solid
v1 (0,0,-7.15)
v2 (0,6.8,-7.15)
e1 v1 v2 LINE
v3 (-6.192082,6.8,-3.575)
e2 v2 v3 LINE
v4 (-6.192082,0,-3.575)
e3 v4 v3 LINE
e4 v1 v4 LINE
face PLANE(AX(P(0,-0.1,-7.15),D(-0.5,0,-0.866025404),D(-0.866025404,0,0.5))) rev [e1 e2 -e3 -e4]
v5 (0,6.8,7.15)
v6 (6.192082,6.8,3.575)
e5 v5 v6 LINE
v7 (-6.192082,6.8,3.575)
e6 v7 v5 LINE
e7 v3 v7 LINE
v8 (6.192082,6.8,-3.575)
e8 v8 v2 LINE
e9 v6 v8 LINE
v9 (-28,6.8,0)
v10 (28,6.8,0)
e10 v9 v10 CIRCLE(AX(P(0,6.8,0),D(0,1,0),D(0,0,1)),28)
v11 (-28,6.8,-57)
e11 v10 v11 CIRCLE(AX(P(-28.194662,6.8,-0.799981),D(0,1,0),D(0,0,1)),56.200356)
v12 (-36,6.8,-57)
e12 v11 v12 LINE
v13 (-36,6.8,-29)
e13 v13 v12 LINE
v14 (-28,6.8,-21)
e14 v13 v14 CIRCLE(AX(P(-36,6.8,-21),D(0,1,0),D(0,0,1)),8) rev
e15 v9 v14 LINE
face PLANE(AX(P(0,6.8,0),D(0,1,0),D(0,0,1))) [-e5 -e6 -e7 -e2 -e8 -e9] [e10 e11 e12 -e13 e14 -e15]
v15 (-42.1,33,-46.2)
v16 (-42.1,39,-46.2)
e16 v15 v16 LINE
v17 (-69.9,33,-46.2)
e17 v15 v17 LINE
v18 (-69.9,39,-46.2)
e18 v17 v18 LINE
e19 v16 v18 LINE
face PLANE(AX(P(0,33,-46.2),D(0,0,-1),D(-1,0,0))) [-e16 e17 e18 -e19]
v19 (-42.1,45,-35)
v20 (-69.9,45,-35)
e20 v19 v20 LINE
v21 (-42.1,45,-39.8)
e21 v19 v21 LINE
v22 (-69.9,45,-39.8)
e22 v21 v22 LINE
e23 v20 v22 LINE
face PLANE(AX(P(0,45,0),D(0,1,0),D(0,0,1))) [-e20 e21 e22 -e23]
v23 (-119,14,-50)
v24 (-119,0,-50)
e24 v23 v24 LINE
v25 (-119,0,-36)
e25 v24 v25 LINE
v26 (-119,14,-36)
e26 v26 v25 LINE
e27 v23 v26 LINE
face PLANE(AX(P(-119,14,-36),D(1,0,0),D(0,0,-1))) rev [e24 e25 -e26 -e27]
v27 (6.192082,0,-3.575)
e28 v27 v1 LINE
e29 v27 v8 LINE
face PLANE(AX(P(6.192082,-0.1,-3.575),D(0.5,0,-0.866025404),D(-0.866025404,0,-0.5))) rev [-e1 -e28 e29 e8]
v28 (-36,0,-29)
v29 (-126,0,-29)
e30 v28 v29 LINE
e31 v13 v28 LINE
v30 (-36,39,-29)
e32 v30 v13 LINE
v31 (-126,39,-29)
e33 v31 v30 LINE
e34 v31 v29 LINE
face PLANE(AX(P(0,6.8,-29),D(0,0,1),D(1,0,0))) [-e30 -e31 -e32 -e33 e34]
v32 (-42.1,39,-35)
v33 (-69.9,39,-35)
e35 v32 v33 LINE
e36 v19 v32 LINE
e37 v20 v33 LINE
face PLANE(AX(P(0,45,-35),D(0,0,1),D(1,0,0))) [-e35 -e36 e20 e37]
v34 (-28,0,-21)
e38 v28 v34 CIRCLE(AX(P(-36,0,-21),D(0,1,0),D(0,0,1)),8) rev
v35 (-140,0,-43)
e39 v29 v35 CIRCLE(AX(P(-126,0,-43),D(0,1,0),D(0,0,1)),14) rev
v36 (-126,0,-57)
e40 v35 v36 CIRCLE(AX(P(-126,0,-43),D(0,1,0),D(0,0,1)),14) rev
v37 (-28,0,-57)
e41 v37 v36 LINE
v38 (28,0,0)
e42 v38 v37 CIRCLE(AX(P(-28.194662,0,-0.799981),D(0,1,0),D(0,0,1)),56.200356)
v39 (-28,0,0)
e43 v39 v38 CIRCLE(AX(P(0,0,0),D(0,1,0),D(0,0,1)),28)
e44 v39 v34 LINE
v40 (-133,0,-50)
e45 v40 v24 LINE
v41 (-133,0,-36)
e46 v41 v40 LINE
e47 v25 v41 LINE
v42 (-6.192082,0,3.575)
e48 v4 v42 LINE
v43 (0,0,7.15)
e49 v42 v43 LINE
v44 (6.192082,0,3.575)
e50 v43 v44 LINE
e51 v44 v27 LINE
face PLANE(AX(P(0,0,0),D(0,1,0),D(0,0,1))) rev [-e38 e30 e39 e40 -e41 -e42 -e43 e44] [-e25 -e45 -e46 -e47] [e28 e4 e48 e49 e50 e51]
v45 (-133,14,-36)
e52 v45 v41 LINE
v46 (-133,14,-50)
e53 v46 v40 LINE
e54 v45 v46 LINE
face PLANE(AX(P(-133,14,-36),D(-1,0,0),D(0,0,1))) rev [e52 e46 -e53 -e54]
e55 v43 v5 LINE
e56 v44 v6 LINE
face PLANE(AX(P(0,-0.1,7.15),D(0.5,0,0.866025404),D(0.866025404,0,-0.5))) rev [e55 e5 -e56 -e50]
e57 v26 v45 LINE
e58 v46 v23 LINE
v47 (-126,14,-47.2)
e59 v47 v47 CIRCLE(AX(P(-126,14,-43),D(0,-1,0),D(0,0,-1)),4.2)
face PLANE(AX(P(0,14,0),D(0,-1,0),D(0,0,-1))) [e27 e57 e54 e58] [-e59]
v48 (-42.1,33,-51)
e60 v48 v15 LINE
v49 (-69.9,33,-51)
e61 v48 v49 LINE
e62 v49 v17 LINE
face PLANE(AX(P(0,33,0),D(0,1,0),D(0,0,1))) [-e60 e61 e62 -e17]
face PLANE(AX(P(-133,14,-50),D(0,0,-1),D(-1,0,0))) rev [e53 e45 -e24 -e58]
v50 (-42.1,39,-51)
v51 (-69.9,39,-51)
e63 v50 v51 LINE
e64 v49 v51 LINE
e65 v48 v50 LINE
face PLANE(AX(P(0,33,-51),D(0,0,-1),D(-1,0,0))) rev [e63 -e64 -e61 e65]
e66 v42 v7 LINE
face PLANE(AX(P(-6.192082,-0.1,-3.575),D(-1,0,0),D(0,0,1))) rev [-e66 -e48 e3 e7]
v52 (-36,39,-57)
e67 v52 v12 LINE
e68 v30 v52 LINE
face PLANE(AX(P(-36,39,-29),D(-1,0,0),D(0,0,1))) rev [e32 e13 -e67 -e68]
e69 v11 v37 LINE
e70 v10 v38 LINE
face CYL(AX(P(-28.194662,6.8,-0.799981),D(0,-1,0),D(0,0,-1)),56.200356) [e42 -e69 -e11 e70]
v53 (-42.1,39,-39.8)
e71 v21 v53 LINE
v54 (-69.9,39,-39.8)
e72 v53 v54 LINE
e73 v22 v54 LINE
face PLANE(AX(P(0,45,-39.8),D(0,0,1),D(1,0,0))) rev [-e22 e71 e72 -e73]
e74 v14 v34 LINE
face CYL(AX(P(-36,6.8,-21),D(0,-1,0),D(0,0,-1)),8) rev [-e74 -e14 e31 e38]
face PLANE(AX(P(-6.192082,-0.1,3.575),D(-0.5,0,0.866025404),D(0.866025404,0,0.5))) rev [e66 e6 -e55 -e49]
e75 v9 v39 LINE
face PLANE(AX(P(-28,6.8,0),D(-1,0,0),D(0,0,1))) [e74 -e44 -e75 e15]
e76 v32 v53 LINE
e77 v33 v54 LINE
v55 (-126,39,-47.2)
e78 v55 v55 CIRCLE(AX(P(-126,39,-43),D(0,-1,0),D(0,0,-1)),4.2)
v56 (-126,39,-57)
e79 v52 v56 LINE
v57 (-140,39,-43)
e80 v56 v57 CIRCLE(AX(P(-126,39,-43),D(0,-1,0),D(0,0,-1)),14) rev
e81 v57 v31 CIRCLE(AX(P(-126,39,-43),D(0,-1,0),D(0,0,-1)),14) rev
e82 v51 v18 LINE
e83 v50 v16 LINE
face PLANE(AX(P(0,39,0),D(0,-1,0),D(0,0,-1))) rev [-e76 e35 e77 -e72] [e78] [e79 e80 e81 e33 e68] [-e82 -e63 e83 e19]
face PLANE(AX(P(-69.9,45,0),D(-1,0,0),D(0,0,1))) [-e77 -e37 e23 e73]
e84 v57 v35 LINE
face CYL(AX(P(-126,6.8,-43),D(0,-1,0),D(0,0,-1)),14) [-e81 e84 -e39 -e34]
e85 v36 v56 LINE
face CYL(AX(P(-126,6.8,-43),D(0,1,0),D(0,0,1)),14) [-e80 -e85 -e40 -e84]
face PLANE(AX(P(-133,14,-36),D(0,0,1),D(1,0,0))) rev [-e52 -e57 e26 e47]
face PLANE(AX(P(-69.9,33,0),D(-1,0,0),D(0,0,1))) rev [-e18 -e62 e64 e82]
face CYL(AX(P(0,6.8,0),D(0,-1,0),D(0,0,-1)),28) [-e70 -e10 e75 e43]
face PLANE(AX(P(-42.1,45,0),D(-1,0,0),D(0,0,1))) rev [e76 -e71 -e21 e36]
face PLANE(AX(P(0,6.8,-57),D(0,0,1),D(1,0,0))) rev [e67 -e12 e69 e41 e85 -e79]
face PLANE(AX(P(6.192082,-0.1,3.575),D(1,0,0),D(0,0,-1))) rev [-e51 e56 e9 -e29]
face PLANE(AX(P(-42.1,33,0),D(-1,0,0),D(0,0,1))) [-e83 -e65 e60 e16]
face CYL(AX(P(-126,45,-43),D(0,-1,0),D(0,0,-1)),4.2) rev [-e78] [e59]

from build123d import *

# Parameters (mm, degrees)
EXTRUDE_1_DEPTH     = 6.8
CUT_EXTRUDE_1_DEPTH = 6.9
SKETCH_3_W          = 104
SKETCH_3_H          = 28
EXTRUDE_2_DEPTH     = 32.2
SKETCH_4_W          = 27.8
SKETCH_4_H          = 4.8
CUT_EXTRUDE_2_DEPTH = 6
SKETCH_4_3_W        = 27.8
SKETCH_4_3_H        = 4.8
EXTRUDE_3_DEPTH     = 6
SKETCH_5_W          = 14
SKETCH_5_H          = 14
CUT_EXTRUDE_3_DEPTH = 14
SKETCH_6_R          = 4.2
CUT_EXTRUDE_4_DEPTH = 155.304892988
FILLET_1_R          = 14


with BuildPart() as part:
    # Эскиз1 → Бобышка-Вытянуть1 (new body)
    with BuildSketch(Plane(origin=(0, 0, 0), x_dir=(1, 0, 0), z_dir=(0, 1, 0))):
        with BuildLine():
            ThreePointArc((-28, 0), (0, -28), (28, 0))
            ThreePointArc((28, 0), (11.895099372, 40.186413418), (-28, 57))
            Line((-28, 57), (-140, 57))
            Line((-140, 57), (-140, 29))
            Line((-140, 29), (-36, 29))
            ThreePointArc((-36, 29), (-30.343145751, 26.656854249), (-28, 21))
            Line((-28, 21), (-28, 0))
        make_face()
    extrude(amount=EXTRUDE_1_DEPTH)

    # Эскиз2 → Вырез-Вытянуть1 (cut)
    with BuildSketch(Plane(origin=(0, 6.8, 0), x_dir=(1, 0, 0), z_dir=(0, 1, 0))):
        Polygon((0, 7.15), (-6.192081637, 3.575), (-6.192081637, -3.575), (0, -7.15), (6.192081637, -3.575), (6.192081637, 3.575), align=None)
    extrude(amount=-CUT_EXTRUDE_1_DEPTH, mode=Mode.SUBTRACT)

    # Эскиз3 → Бобышка-Вытянуть2 (add)
    with BuildSketch(Plane(origin=(0, 6.8, 0), x_dir=(1, 0, 0), z_dir=(0, 1, 0))):
        with Locations((-88, 43)):
            Rectangle(SKETCH_3_W, SKETCH_3_H)
    extrude(amount=EXTRUDE_2_DEPTH)

    # Эскиз4 → Вырез-Вытянуть2 (cut)
    with BuildSketch(Plane(origin=(0, 39, 0), x_dir=(1, 0, 0), z_dir=(0, 1, 0))):
        with Locations((-56, 48.6)):
            Rectangle(SKETCH_4_W, SKETCH_4_H)
    extrude(amount=-CUT_EXTRUDE_2_DEPTH, mode=Mode.SUBTRACT)

    # Эскиз4<3> → Бобышка-Вытянуть3 (add)
    with BuildSketch(Plane(origin=(0, 39, 0), x_dir=(1, 0, 0), z_dir=(0, 1, 0))):
        with Locations((-56, 37.4)):
            Rectangle(SKETCH_4_3_W, SKETCH_4_3_H)
    extrude(amount=EXTRUDE_3_DEPTH)

    # Эскиз5 → Вырез-Вытянуть3 (cut)
    with BuildSketch(Plane.XZ):
        with Locations((-126, -43)):
            Rectangle(SKETCH_5_W, SKETCH_5_H)
    extrude(amount=-CUT_EXTRUDE_3_DEPTH, mode=Mode.SUBTRACT)

    # Эскиз6 → Вырез-Вытянуть4 (cut, through all)
    with BuildSketch(Plane.XZ.offset(-14)):
        with Locations(Location((-126, -43, 0), (0, 0, 270))):
            Circle(SKETCH_6_R)
    extrude(amount=-CUT_EXTRUDE_4_DEPTH, mode=Mode.SUBTRACT)

    # Скругление1
    fillet_1_edges = [part.edges().sort_by_distance(p)[0] for p in [
        (-140, 19.5, -29),
        (-140, 19.5, -57),
    ]]
    fillet(fillet_1_edges, radius=FILLET_1_R - 0.0001)  # a hair under: the kernel refuses the full size


solid = part.part
